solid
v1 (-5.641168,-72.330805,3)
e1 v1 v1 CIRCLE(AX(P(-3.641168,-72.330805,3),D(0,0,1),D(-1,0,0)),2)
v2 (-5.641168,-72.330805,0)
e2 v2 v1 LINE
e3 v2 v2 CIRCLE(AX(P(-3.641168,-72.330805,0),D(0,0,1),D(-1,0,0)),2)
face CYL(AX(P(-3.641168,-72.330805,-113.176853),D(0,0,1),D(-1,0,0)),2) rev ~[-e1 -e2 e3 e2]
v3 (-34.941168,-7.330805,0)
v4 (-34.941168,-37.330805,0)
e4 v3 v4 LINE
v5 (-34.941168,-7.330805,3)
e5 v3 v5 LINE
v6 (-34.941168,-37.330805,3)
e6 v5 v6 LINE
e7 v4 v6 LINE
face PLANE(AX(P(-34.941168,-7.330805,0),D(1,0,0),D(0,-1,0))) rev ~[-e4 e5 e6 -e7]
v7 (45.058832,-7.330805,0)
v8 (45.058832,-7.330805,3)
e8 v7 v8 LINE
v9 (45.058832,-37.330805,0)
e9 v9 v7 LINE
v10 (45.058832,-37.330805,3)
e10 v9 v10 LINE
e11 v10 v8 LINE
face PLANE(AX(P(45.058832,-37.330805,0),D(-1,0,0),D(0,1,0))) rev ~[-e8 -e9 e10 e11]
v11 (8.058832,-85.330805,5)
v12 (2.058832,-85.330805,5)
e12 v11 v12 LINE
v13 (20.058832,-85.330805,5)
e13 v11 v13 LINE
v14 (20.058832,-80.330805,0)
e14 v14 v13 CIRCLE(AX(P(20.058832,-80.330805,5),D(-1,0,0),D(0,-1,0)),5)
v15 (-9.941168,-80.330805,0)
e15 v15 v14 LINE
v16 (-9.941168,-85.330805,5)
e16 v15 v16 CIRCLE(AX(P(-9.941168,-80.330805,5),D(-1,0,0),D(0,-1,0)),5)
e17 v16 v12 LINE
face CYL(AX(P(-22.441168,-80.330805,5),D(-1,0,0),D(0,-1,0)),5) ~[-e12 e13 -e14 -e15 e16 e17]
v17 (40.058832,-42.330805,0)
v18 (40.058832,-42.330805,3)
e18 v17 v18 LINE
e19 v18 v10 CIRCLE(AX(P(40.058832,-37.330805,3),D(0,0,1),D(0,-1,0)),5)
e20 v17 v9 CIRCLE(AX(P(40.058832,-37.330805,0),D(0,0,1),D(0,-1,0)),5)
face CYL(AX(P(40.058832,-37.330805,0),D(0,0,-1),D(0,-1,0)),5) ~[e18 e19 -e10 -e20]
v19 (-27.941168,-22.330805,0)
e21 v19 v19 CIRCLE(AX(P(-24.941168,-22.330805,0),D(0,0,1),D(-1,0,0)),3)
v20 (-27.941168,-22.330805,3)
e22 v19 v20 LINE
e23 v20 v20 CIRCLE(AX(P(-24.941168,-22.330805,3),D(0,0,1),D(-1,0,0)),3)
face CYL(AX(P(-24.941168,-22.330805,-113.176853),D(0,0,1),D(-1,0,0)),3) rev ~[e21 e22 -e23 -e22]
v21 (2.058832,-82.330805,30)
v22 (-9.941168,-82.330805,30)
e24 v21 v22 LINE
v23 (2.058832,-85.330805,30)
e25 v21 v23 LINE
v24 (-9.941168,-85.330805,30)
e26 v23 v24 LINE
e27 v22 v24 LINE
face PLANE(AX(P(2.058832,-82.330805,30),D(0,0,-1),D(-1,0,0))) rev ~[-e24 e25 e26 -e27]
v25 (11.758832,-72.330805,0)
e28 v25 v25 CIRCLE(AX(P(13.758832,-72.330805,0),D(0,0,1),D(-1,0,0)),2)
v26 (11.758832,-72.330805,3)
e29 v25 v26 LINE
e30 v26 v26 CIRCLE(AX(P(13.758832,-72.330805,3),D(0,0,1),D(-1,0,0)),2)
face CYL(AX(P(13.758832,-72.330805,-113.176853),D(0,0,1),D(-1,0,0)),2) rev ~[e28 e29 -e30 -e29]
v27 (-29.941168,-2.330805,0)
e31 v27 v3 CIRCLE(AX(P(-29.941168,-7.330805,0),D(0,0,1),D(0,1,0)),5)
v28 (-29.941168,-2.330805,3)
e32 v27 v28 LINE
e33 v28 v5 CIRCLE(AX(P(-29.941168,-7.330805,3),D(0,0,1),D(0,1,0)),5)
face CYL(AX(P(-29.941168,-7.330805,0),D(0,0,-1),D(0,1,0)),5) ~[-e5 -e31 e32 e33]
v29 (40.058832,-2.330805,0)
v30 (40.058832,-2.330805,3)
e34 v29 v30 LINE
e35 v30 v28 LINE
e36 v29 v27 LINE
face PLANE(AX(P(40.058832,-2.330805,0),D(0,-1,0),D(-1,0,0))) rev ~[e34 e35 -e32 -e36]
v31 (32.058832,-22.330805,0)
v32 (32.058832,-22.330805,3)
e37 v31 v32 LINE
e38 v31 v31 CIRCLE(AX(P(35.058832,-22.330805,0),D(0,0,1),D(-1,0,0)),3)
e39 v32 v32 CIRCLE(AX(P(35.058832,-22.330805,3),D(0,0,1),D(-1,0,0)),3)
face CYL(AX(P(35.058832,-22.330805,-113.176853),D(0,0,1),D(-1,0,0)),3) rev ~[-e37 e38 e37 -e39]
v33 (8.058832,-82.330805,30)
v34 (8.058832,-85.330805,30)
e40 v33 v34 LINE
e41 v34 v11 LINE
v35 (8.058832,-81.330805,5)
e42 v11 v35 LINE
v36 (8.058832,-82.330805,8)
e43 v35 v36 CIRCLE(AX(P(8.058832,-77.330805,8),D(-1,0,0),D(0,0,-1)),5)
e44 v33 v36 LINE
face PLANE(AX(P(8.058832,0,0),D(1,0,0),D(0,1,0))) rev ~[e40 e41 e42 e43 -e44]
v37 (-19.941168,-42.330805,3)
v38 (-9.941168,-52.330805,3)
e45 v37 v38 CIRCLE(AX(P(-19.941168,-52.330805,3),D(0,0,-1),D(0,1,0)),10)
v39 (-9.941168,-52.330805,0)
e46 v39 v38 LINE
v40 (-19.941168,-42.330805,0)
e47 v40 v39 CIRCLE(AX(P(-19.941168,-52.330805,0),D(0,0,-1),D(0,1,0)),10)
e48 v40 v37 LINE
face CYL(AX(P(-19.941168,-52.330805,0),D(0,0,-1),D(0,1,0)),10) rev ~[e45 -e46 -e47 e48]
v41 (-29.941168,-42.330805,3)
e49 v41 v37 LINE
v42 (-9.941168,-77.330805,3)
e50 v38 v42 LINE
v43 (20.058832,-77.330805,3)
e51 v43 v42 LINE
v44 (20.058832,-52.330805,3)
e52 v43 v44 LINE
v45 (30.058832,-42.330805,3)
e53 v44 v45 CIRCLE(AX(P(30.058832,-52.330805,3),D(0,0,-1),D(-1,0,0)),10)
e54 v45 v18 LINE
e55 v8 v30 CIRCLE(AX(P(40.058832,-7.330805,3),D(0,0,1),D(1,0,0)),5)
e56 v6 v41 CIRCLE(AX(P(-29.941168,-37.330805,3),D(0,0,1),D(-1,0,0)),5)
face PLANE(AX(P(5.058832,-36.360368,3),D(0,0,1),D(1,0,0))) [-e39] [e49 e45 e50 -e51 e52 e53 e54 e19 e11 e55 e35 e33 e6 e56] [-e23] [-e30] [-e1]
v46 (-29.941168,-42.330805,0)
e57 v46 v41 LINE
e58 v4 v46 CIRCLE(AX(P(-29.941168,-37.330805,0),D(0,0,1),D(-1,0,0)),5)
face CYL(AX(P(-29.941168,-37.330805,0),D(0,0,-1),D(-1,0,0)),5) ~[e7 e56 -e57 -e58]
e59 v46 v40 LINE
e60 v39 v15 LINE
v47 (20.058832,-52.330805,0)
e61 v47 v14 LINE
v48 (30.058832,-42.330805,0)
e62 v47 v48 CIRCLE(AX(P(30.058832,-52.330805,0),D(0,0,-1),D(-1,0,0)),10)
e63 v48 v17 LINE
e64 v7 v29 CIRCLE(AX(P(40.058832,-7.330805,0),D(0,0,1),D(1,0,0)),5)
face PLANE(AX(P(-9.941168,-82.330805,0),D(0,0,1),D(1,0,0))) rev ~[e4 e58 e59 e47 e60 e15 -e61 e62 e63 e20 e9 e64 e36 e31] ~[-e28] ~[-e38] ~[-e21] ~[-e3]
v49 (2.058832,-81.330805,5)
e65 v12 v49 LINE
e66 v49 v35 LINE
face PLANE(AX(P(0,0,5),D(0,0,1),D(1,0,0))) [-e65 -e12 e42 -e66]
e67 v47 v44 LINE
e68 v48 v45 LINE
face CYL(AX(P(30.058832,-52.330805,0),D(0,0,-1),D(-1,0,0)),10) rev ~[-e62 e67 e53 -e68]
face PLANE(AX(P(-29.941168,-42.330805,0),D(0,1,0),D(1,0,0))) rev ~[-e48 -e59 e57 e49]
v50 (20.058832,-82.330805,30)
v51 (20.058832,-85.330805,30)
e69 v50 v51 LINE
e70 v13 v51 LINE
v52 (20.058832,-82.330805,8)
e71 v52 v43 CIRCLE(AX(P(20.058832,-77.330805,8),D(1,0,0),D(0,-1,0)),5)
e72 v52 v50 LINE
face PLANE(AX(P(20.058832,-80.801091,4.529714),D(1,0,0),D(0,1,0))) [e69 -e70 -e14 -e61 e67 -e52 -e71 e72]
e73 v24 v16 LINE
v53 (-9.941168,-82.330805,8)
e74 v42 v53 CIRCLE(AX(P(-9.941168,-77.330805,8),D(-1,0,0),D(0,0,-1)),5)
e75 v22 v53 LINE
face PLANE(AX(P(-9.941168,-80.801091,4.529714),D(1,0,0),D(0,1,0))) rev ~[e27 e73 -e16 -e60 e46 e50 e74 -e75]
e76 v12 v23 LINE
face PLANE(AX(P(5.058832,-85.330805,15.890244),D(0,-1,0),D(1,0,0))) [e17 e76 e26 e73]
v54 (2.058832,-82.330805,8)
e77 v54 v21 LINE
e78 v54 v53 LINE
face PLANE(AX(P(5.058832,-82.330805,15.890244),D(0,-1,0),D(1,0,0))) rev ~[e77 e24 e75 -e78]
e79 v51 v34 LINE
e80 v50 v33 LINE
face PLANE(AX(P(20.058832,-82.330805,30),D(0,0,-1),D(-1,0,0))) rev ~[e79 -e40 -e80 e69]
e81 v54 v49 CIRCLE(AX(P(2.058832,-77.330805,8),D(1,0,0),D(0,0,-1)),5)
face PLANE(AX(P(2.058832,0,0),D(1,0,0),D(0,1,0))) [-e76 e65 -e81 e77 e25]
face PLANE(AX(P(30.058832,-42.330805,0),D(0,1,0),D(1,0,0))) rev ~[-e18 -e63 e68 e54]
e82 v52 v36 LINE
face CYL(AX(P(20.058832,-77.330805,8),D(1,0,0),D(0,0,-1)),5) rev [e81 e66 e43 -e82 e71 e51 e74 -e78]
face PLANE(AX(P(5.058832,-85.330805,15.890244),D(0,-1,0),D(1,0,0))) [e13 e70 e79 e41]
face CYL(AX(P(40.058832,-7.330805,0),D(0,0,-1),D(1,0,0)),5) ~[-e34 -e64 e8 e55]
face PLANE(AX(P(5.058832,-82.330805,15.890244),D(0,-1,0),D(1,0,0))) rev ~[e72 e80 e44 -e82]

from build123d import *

# Parameters (mm, degrees)
F1_DEPTH     = 3
F2_D         = 4
F3_D         = 6
F5_W         = 30
F5_H         = 3
F6_DEPTH     = 3
F7_T4_DEPTH  = 30
F7_T10_DEPTH = 30
F7_T16_DEPTH = 30
F7_T23_DEPTH = 30
F7_T29_DEPTH = 30
F7_T32_DEPTH = 55


# Not quite as in the source:
# - a fillet or chamfer that OpenCascade refuses, or shapes differently, is made with other operations: its cross-section is extruded or revolved along the edge and cut away or added


with BuildPart() as f1:
    # F0 (on Top) → F1 (new body)
    with BuildSketch(Plane.XY):
        with BuildLine():
            Line((40.0588317961, -2.3308048306), (-29.9411682039, -2.3308048306))
            ThreePointArc((-29.9411682039, -2.3308048306), (-33.4767021099, -3.7952709247), (-34.9411682039, -7.3308048306))
            Line((-34.9411682039, -7.3308048306), (-34.9411682039, -37.3308048306))
            ThreePointArc((-34.9411682039, -37.3308048306), (-33.4767021099, -40.8663387365), (-29.9411682039, -42.3308048306))
            Line((-29.9411682039, -42.3308048306), (-19.9411682039, -42.3308048306))
            ThreePointArc((-19.9411682039, -42.3308048306), (-12.8701003921, -45.2597370187), (-9.9411682039, -52.3308048306))
            Line((-9.9411682039, -52.3308048306), (-9.9411682039, -82.3308048306))
            Line((-9.9411682039, -82.3308048306), (5.0588317961, -82.3308048306))
            Line((5.0588317961, -82.3308048306), (20.0588317961, -82.3308048306))
            Line((20.0588317961, -82.3308048306), (20.0588317961, -52.3308048306))
            ThreePointArc((20.0588317961, -52.3308048306), (22.9877639842, -45.2597370187), (30.0588317961, -42.3308048306))
            Line((30.0588317961, -42.3308048306), (40.0588317961, -42.3308048306))
            ThreePointArc((40.0588317961, -42.3308048306), (43.594365702, -40.8663387365), (45.0588317961, -37.3308048306))
            Line((45.0588317961, -37.3308048306), (45.0588317961, -7.3308048306))
            ThreePointArc((45.0588317961, -7.3308048306), (43.594365702, -3.7952709247), (40.0588317961, -2.3308048306))
        make_face()
    extrude(amount=F1_DEPTH)

    # F2 (through all)
    with Locations(Plane(origin=(0, 0, 0), x_dir=(1, 0, 0), z_dir=(0, 0, -1))):
        with Locations((-3.6411682039, 72.3308048306), (13.7588317961, 72.3308048306)):
            Hole(F2_D / 2)

    # F3 (through all)
    with Locations(Plane(origin=(0, 0, 0), x_dir=(1, 0, 0), z_dir=(0, 0, -1))):
        with Locations((-24.9411682039, 22.3308048306), (35.0588317961, 22.3308048306)):
            Hole(F3_D / 2)

    # F5 (on face) → F6 (join)
    with BuildSketch(Plane.XZ.offset(82.3308048306)):
        Polygon((-9.9411682039, 30), (-9.9411682039, 3), (20.0588317961, 3), (20.0588317961, 30), (8.0588317961, 30), (8.0588317961, 5), (2.0588317961, 5), (2.0588317961, 30), align=None)
        with Locations((5.0588317961, 1.5)):
            Rectangle(F5_W, F5_H)
    extrude(amount=F6_DEPTH)

    # F7: fillet of radius 5 on 2 edges, made by hand


with BuildPart() as f7_tool2:
    # F7_s3 → F7_t4 (new body)
    with BuildSketch(Plane.YZ.offset(20.0588317961)):
        with BuildLine():
            ThreePointArc((-77.3308048306, 3), (-80.8663387365, 4.4644660941), (-82.3308048306, 8))
            Line((-82.3308048306, 8), (-82.3308048306, 3))
            Line((-82.3308048306, 3), (-77.3308048306, 3))
        make_face()
    extrude(amount=-F7_T4_DEPTH)

    split(bisect_by=Plane.XY.offset(5), keep=Keep.BOTTOM)

    split(bisect_by=Plane.YZ.offset(8.0588317961), keep=Keep.TOP)


with BuildPart() as f1_1:
    add(f1.part)

    # F7_t1: union F7_tool2
    add(f7_tool2.part)


with BuildPart() as f7_tool8:
    # F7_s9 → F7_t10 (new body)
    with BuildSketch(Plane.YZ.offset(20.0588317961)):
        with BuildLine():
            ThreePointArc((-77.3308048306, 3), (-80.8663387365, 4.4644660941), (-82.3308048306, 8))
            Line((-82.3308048306, 8), (-82.3308048306, 3))
            Line((-82.3308048306, 3), (-77.3308048306, 3))
        make_face()
    extrude(amount=-F7_T10_DEPTH)

    split(bisect_by=Plane.XY.offset(5), keep=Keep.TOP)

    split(bisect_by=Plane.YZ.offset(8.0588317961), keep=Keep.TOP)


with BuildPart() as f1_2:
    add(f1_1.part)

    # F7_t7: union F7_tool8
    add(f7_tool8.part)


with BuildPart() as f7_tool14:
    # F7_s15 → F7_t16 (new body)
    with BuildSketch(Plane.YZ.offset(20.0588317961)):
        with BuildLine():
            ThreePointArc((-77.3308048306, 3), (-80.8663387365, 4.4644660941), (-82.3308048306, 8))
            Line((-82.3308048306, 8), (-82.3308048306, 3))
            Line((-82.3308048306, 3), (-77.3308048306, 3))
        make_face()
    extrude(amount=-F7_T16_DEPTH)

    split(bisect_by=Plane.YZ.offset(2.0588317961), keep=Keep.TOP)

    split(bisect_by=Plane.XY.offset(5), keep=Keep.BOTTOM)

    split(bisect_by=Plane.YZ.offset(8.0588317961), keep=Keep.BOTTOM)


with BuildPart() as f1_3:
    add(f1_2.part)

    # F7_t13: union F7_tool14
    add(f7_tool14.part)


with BuildPart() as f7_tool21:
    # F7_s22 → F7_t23 (new body)
    with BuildSketch(Plane.YZ.offset(20.0588317961)):
        with BuildLine():
            ThreePointArc((-77.3308048306, 3), (-80.8663387365, 4.4644660941), (-82.3308048306, 8))
            Line((-82.3308048306, 8), (-82.3308048306, 3))
            Line((-82.3308048306, 3), (-77.3308048306, 3))
        make_face()
    extrude(amount=-F7_T23_DEPTH)

    split(bisect_by=Plane.YZ.offset(2.0588317961), keep=Keep.BOTTOM)

    split(bisect_by=Plane.XY.offset(5), keep=Keep.BOTTOM)


with BuildPart() as f1_4:
    add(f1_3.part)

    # F7_t20: union F7_tool21
    add(f7_tool21.part)


with BuildPart() as f7_tool27:
    # F7_s28 → F7_t29 (new body)
    with BuildSketch(Plane.YZ.offset(20.0588317961)):
        with BuildLine():
            ThreePointArc((-77.3308048306, 3), (-80.8663387365, 4.4644660941), (-82.3308048306, 8))
            Line((-82.3308048306, 8), (-82.3308048306, 3))
            Line((-82.3308048306, 3), (-77.3308048306, 3))
        make_face()
    extrude(amount=-F7_T29_DEPTH)

    split(bisect_by=Plane.YZ.offset(2.0588317961), keep=Keep.BOTTOM)

    split(bisect_by=Plane.XY.offset(5), keep=Keep.TOP)


with BuildPart() as f1_5:
    add(f1_4.part)

    # F7_t26: union F7_tool27
    add(f7_tool27.part)

    # F7_s33 → F7_t32 (cut)
    with BuildSketch(Plane.YZ.offset(-22.4411682039)):
        with BuildLine():
            ThreePointArc((-85.3308048306, 5), (-83.8663387365, 1.4644660941), (-80.3308048306, 0))
            Line((-80.3308048306, 0), (-85.3308048306, 0))
            Line((-85.3308048306, 0), (-85.3308048306, 5))
        make_face()
    extrude(amount=F7_T32_DEPTH, mode=Mode.SUBTRACT)


solid = f1_5.part
